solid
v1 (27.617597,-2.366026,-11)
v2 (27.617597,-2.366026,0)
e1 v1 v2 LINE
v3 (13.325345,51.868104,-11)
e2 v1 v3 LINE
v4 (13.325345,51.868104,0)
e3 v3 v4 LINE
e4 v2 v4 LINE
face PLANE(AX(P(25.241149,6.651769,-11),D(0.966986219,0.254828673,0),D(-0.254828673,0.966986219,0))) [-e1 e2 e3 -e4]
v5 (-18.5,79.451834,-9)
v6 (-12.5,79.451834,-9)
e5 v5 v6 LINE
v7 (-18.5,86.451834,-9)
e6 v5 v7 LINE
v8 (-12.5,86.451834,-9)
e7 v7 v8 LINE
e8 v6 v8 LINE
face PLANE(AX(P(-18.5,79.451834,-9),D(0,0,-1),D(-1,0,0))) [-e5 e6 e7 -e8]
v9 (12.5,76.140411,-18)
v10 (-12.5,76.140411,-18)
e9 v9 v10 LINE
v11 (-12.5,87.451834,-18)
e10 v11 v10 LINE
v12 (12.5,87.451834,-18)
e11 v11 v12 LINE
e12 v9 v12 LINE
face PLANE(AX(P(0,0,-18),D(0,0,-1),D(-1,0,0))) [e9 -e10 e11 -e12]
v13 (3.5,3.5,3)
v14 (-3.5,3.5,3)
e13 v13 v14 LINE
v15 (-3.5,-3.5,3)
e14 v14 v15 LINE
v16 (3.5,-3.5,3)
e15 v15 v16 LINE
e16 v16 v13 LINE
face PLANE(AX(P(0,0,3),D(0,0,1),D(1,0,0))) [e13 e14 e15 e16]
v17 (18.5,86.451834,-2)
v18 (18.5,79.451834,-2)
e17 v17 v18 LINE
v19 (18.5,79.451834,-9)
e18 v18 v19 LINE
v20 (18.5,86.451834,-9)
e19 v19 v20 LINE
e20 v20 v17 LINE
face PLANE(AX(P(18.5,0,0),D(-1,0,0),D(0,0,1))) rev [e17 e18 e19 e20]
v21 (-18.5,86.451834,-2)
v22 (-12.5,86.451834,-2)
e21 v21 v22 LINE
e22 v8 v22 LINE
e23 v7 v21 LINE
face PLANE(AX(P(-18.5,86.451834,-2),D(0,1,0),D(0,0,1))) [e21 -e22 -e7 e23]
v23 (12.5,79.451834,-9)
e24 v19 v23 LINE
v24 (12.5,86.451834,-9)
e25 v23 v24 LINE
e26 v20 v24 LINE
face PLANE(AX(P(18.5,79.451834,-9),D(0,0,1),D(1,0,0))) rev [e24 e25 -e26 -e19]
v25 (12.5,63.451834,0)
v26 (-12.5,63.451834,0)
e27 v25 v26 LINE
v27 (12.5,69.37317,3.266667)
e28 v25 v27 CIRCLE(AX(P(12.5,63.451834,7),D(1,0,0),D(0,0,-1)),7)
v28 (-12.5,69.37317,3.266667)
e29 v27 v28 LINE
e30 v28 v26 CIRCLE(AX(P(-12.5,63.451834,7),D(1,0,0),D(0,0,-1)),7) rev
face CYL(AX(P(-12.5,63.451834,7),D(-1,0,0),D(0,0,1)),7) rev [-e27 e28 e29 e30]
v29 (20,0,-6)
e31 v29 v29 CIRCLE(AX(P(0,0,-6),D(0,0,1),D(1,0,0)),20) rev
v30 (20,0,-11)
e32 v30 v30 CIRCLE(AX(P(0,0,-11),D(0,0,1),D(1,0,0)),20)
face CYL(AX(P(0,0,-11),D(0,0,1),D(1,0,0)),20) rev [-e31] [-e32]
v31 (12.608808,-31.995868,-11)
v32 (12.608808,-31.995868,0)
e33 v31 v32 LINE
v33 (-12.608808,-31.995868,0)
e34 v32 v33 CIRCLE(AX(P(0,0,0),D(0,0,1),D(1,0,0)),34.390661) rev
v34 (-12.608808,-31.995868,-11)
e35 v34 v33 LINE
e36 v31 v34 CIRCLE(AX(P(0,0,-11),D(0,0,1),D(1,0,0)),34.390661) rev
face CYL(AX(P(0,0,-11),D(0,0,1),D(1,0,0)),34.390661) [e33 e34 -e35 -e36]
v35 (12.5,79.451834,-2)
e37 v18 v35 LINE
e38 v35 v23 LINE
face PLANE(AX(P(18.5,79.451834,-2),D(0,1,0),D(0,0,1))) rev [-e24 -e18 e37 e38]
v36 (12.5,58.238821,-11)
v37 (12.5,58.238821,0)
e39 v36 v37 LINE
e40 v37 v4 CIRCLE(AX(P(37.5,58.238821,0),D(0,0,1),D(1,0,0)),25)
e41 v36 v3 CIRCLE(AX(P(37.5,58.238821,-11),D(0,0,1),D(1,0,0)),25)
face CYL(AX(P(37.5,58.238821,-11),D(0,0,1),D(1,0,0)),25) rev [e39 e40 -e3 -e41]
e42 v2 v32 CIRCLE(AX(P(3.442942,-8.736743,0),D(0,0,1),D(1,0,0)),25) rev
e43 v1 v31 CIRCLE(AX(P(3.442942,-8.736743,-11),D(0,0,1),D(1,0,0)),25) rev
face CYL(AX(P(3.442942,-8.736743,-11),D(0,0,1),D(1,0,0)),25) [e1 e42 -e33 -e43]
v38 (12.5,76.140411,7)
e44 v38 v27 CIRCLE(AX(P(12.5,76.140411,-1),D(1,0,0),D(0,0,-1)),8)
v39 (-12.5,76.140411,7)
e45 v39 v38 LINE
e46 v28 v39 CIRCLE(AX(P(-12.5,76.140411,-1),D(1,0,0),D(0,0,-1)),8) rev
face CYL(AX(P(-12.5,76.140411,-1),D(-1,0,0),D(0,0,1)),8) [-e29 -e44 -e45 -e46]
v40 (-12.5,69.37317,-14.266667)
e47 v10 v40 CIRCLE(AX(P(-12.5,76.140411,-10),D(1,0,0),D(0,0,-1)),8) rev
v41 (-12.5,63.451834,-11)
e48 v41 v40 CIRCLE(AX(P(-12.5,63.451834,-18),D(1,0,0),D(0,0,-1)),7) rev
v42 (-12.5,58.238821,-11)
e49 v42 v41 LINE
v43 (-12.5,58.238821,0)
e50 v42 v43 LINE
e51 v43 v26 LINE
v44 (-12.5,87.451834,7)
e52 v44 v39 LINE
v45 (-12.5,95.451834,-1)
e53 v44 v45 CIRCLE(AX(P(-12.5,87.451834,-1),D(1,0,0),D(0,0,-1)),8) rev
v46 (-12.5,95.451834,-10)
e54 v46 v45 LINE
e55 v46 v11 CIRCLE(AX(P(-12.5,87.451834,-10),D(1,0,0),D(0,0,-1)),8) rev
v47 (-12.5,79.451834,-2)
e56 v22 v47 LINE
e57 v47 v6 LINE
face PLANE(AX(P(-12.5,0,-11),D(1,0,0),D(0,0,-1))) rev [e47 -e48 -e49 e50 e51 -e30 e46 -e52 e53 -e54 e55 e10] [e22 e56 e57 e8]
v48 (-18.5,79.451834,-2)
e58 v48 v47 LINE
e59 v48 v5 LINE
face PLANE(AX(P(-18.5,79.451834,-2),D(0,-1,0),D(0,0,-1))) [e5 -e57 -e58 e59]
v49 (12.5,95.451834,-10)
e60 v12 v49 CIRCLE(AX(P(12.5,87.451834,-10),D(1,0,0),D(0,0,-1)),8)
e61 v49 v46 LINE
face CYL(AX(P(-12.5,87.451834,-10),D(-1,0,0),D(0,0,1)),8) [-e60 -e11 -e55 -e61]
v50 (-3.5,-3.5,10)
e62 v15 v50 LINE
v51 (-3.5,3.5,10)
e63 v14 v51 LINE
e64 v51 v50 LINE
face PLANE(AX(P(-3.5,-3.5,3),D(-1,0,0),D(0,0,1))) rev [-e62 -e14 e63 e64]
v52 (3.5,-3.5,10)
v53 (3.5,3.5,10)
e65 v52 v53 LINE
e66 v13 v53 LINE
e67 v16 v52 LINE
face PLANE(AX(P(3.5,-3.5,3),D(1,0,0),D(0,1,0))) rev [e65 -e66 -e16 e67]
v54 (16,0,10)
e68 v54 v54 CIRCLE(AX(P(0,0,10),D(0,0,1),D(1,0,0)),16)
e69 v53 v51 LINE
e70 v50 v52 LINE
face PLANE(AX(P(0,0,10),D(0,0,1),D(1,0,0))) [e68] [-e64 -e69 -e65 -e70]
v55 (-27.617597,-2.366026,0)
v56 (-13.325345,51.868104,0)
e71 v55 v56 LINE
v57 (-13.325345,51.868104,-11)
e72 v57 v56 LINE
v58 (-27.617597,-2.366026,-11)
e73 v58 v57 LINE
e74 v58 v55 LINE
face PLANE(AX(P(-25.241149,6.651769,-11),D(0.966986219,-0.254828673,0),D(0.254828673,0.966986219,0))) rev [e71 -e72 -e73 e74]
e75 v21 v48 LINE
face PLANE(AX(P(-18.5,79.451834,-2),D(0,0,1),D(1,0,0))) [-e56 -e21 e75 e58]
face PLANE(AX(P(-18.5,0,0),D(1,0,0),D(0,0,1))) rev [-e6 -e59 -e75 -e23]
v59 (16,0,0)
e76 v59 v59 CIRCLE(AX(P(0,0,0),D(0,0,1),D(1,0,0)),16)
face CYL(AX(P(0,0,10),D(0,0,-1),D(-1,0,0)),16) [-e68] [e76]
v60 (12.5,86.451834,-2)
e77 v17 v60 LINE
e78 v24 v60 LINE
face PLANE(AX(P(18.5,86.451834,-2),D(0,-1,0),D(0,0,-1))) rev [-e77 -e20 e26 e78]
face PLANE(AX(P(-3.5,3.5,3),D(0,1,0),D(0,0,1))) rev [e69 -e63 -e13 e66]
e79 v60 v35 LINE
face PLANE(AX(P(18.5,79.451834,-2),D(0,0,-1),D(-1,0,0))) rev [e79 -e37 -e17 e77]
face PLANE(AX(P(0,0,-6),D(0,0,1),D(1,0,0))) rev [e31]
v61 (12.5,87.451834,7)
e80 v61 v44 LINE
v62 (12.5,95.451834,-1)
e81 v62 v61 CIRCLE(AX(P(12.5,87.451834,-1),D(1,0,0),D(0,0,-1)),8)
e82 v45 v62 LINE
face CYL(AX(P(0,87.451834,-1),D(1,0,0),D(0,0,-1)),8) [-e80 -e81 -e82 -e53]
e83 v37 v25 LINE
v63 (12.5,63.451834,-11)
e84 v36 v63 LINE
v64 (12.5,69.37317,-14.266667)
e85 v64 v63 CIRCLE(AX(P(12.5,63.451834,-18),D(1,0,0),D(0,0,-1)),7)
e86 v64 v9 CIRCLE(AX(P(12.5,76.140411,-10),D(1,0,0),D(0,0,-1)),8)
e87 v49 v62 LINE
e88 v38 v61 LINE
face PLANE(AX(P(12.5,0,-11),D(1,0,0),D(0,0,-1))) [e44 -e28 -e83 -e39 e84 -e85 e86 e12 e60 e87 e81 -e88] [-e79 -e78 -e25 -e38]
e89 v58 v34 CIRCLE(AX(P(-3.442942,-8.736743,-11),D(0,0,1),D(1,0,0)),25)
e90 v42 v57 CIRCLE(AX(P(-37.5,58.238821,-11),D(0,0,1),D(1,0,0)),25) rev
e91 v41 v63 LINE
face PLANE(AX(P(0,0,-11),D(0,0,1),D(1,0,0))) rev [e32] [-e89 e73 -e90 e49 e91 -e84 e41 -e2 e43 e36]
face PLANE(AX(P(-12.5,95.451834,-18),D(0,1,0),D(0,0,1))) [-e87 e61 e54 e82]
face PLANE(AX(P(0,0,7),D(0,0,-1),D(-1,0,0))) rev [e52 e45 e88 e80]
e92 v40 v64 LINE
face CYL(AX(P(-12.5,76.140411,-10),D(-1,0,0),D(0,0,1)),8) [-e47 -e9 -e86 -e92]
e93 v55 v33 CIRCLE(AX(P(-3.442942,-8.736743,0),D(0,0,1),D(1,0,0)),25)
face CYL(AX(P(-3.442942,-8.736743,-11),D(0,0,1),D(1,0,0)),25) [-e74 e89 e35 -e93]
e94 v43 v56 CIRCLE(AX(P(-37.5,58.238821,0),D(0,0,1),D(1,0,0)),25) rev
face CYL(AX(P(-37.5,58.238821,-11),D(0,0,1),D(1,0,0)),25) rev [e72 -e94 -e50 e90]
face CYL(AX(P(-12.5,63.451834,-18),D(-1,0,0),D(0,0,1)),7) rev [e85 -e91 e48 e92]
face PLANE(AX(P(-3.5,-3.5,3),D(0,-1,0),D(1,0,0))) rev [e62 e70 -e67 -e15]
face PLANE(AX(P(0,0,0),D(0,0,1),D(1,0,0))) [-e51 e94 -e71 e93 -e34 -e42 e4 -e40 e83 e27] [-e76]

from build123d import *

# Parameters (mm, degrees)
SKETCH1_R                = 20
SKETCH1_R_2              = 4
BOSS_EXTRUDE1_DEPTH      = 11
SKETCH1_4_R              = 20
BOSS_EXTRUDE2_DEPTH      = 6
SKETCH3_R                = 16
BOSS_EXTRUDE3_DEPTH      = 10
SKETCH4_W                = 7
SKETCH4_H                = 7
CUT_EXTRUDE1_DEPTH       = 7
BOSS_EXTRUDE4_DEPTH      = 7
BOSS_EXTRUDE4_DEPTH_BACK = 18
SKETCH5_W                = 25
SKETCH5_H                = 25
SKETCH6_W                = 7
SKETCH6_H                = 7
BOSS_EXTRUDE5_DEPTH      = 6
CUT_EXTRUDE2_DEPTH       = 11
FILLET1_R                = 7
FILLET2_R                = 7
FILLET3_R                = 8


with BuildPart() as part:
    # Sketch1 → Boss-Extrude1 (new body)
    with BuildSketch(Plane.XY):
        with BuildLine():
            Line((-27.617597302, -2.366025969), (-13.325344527, 51.86810446))
            ThreePointArc((-13.325344527, 51.86810446), (-12.707194725, 55.026842667), (-12.5, 58.238821277))
            Line((-12.5, 58.238821277), (-12.5, 67.307346))
            Line((-12.5, 67.307346), (-12.5, 95.903667694))
            ThreePointArc((-12.5, 95.903667694), (0, 100.951833847), (12.5, 95.903667694))
            Line((12.5, 95.903667694), (12.5, 67.307346))
            Line((12.5, 67.307346), (12.5, 58.238821277))
            ThreePointArc((12.5, 58.238821277), (12.707194725, 55.026842667), (13.325344527, 51.86810446))
            Line((13.325344527, 51.86810446), (27.617597302, -2.366025969))
            ThreePointArc((27.617597302, -2.366025969), (25.744947954, -20.033668156), (12.608807935, -31.995867846))
            ThreePointArc((12.608807935, -31.995867846), (0, -34.390661476), (-12.608807935, -31.995867846))
            ThreePointArc((-12.608807935, -31.995867846), (-25.744947954, -20.033668156), (-27.617597302, -2.366025969))
        make_face()
        Circle(SKETCH1_R, mode=Mode.SUBTRACT)
        with Locations((0, 82.951833847)):
            Circle(SKETCH1_R_2, mode=Mode.SUBTRACT)
    extrude(amount=-BOSS_EXTRUDE1_DEPTH)

    # Sketch1<4> → Boss-Extrude2 (add)
    with BuildSketch(Plane.XY):
        Circle(SKETCH1_4_R)
    extrude(amount=-BOSS_EXTRUDE2_DEPTH)

    # Sketch3 → Boss-Extrude3 (add)
    with BuildSketch(Plane.XY):
        Circle(SKETCH3_R)
    extrude(amount=BOSS_EXTRUDE3_DEPTH)

    # Sketch4 → Cut-Extrude1 (cut)
    with BuildSketch(Plane.XY.offset(10)):
        Rectangle(SKETCH4_W, SKETCH4_H)
    extrude(amount=-CUT_EXTRUDE1_DEPTH, mode=Mode.SUBTRACT)

    # Sketch5 → Boss-Extrude4 (add, two sides: drawn at the far end of the back side and taken through both)
    with BuildSketch(Plane.XY.offset(-BOSS_EXTRUDE4_DEPTH_BACK)):
        with Locations((0, 82.951833847)):
            Rectangle(SKETCH5_W, SKETCH5_H)
    extrude(amount=BOSS_EXTRUDE4_DEPTH + BOSS_EXTRUDE4_DEPTH_BACK)

    # Sketch6 → Boss-Extrude5 (add)
    with BuildSketch(Plane(origin=(12.5, 0, 0), x_dir=(0, 0, -1), z_dir=(1, 0, 0))):
        with Locations((5.5, 82.951833847)):
            Rectangle(SKETCH6_W, SKETCH6_H)
    boss_extrude5 = extrude(amount=BOSS_EXTRUDE5_DEPTH)

    # Mirror1: Boss-Extrude5 across plane
    add(boss_extrude5.mirror(Plane(origin=(0, 0, 0), x_dir=(0, 0, 1), z_dir=(1, 0, 0))))

    # Sketch7 → Cut-Extrude2 (cut)
    with BuildSketch(Plane.XY):
        with BuildLine():
            Line((-12.5, 95.451833847), (12.5, 95.451833847))
            Line((12.5, 95.451833847), (12.5, 95.903667694))
            ThreePointArc((12.5, 95.903667694), (0, 100.951833847), (-12.5, 95.903667694))
            Line((-12.5, 95.903667694), (-12.5, 95.451833847))
        make_face()
    extrude(amount=-CUT_EXTRUDE2_DEPTH, mode=Mode.SUBTRACT)

    # Fillet1
    fillet1_edges = [part.edges().sort_by_distance(p)[0] for p in [
        (0, 70.451833847, 0),
    ]]
    fillet(fillet1_edges, radius=FILLET1_R - 0.0001)  # a hair under: the kernel refuses the full size

    # Fillet2
    fillet2_edges = [part.edges().sort_by_distance(p)[0] for p in [
        (0, 70.451833847, -11),
    ]]
    fillet(fillet2_edges, radius=FILLET2_R - 0.0001)  # a hair under: the kernel refuses the full size

    # Fillet3
    fillet3_edges = [part.edges().sort_by_distance(p)[0] for p in [
        (0, 70.451833847, -18),
        (0, 95.451833847, -18),
        (0, 95.451833847, 7),
        (0, 70.451833847, 7),
    ]]
    fillet(fillet3_edges, radius=FILLET3_R)


solid = part.part
